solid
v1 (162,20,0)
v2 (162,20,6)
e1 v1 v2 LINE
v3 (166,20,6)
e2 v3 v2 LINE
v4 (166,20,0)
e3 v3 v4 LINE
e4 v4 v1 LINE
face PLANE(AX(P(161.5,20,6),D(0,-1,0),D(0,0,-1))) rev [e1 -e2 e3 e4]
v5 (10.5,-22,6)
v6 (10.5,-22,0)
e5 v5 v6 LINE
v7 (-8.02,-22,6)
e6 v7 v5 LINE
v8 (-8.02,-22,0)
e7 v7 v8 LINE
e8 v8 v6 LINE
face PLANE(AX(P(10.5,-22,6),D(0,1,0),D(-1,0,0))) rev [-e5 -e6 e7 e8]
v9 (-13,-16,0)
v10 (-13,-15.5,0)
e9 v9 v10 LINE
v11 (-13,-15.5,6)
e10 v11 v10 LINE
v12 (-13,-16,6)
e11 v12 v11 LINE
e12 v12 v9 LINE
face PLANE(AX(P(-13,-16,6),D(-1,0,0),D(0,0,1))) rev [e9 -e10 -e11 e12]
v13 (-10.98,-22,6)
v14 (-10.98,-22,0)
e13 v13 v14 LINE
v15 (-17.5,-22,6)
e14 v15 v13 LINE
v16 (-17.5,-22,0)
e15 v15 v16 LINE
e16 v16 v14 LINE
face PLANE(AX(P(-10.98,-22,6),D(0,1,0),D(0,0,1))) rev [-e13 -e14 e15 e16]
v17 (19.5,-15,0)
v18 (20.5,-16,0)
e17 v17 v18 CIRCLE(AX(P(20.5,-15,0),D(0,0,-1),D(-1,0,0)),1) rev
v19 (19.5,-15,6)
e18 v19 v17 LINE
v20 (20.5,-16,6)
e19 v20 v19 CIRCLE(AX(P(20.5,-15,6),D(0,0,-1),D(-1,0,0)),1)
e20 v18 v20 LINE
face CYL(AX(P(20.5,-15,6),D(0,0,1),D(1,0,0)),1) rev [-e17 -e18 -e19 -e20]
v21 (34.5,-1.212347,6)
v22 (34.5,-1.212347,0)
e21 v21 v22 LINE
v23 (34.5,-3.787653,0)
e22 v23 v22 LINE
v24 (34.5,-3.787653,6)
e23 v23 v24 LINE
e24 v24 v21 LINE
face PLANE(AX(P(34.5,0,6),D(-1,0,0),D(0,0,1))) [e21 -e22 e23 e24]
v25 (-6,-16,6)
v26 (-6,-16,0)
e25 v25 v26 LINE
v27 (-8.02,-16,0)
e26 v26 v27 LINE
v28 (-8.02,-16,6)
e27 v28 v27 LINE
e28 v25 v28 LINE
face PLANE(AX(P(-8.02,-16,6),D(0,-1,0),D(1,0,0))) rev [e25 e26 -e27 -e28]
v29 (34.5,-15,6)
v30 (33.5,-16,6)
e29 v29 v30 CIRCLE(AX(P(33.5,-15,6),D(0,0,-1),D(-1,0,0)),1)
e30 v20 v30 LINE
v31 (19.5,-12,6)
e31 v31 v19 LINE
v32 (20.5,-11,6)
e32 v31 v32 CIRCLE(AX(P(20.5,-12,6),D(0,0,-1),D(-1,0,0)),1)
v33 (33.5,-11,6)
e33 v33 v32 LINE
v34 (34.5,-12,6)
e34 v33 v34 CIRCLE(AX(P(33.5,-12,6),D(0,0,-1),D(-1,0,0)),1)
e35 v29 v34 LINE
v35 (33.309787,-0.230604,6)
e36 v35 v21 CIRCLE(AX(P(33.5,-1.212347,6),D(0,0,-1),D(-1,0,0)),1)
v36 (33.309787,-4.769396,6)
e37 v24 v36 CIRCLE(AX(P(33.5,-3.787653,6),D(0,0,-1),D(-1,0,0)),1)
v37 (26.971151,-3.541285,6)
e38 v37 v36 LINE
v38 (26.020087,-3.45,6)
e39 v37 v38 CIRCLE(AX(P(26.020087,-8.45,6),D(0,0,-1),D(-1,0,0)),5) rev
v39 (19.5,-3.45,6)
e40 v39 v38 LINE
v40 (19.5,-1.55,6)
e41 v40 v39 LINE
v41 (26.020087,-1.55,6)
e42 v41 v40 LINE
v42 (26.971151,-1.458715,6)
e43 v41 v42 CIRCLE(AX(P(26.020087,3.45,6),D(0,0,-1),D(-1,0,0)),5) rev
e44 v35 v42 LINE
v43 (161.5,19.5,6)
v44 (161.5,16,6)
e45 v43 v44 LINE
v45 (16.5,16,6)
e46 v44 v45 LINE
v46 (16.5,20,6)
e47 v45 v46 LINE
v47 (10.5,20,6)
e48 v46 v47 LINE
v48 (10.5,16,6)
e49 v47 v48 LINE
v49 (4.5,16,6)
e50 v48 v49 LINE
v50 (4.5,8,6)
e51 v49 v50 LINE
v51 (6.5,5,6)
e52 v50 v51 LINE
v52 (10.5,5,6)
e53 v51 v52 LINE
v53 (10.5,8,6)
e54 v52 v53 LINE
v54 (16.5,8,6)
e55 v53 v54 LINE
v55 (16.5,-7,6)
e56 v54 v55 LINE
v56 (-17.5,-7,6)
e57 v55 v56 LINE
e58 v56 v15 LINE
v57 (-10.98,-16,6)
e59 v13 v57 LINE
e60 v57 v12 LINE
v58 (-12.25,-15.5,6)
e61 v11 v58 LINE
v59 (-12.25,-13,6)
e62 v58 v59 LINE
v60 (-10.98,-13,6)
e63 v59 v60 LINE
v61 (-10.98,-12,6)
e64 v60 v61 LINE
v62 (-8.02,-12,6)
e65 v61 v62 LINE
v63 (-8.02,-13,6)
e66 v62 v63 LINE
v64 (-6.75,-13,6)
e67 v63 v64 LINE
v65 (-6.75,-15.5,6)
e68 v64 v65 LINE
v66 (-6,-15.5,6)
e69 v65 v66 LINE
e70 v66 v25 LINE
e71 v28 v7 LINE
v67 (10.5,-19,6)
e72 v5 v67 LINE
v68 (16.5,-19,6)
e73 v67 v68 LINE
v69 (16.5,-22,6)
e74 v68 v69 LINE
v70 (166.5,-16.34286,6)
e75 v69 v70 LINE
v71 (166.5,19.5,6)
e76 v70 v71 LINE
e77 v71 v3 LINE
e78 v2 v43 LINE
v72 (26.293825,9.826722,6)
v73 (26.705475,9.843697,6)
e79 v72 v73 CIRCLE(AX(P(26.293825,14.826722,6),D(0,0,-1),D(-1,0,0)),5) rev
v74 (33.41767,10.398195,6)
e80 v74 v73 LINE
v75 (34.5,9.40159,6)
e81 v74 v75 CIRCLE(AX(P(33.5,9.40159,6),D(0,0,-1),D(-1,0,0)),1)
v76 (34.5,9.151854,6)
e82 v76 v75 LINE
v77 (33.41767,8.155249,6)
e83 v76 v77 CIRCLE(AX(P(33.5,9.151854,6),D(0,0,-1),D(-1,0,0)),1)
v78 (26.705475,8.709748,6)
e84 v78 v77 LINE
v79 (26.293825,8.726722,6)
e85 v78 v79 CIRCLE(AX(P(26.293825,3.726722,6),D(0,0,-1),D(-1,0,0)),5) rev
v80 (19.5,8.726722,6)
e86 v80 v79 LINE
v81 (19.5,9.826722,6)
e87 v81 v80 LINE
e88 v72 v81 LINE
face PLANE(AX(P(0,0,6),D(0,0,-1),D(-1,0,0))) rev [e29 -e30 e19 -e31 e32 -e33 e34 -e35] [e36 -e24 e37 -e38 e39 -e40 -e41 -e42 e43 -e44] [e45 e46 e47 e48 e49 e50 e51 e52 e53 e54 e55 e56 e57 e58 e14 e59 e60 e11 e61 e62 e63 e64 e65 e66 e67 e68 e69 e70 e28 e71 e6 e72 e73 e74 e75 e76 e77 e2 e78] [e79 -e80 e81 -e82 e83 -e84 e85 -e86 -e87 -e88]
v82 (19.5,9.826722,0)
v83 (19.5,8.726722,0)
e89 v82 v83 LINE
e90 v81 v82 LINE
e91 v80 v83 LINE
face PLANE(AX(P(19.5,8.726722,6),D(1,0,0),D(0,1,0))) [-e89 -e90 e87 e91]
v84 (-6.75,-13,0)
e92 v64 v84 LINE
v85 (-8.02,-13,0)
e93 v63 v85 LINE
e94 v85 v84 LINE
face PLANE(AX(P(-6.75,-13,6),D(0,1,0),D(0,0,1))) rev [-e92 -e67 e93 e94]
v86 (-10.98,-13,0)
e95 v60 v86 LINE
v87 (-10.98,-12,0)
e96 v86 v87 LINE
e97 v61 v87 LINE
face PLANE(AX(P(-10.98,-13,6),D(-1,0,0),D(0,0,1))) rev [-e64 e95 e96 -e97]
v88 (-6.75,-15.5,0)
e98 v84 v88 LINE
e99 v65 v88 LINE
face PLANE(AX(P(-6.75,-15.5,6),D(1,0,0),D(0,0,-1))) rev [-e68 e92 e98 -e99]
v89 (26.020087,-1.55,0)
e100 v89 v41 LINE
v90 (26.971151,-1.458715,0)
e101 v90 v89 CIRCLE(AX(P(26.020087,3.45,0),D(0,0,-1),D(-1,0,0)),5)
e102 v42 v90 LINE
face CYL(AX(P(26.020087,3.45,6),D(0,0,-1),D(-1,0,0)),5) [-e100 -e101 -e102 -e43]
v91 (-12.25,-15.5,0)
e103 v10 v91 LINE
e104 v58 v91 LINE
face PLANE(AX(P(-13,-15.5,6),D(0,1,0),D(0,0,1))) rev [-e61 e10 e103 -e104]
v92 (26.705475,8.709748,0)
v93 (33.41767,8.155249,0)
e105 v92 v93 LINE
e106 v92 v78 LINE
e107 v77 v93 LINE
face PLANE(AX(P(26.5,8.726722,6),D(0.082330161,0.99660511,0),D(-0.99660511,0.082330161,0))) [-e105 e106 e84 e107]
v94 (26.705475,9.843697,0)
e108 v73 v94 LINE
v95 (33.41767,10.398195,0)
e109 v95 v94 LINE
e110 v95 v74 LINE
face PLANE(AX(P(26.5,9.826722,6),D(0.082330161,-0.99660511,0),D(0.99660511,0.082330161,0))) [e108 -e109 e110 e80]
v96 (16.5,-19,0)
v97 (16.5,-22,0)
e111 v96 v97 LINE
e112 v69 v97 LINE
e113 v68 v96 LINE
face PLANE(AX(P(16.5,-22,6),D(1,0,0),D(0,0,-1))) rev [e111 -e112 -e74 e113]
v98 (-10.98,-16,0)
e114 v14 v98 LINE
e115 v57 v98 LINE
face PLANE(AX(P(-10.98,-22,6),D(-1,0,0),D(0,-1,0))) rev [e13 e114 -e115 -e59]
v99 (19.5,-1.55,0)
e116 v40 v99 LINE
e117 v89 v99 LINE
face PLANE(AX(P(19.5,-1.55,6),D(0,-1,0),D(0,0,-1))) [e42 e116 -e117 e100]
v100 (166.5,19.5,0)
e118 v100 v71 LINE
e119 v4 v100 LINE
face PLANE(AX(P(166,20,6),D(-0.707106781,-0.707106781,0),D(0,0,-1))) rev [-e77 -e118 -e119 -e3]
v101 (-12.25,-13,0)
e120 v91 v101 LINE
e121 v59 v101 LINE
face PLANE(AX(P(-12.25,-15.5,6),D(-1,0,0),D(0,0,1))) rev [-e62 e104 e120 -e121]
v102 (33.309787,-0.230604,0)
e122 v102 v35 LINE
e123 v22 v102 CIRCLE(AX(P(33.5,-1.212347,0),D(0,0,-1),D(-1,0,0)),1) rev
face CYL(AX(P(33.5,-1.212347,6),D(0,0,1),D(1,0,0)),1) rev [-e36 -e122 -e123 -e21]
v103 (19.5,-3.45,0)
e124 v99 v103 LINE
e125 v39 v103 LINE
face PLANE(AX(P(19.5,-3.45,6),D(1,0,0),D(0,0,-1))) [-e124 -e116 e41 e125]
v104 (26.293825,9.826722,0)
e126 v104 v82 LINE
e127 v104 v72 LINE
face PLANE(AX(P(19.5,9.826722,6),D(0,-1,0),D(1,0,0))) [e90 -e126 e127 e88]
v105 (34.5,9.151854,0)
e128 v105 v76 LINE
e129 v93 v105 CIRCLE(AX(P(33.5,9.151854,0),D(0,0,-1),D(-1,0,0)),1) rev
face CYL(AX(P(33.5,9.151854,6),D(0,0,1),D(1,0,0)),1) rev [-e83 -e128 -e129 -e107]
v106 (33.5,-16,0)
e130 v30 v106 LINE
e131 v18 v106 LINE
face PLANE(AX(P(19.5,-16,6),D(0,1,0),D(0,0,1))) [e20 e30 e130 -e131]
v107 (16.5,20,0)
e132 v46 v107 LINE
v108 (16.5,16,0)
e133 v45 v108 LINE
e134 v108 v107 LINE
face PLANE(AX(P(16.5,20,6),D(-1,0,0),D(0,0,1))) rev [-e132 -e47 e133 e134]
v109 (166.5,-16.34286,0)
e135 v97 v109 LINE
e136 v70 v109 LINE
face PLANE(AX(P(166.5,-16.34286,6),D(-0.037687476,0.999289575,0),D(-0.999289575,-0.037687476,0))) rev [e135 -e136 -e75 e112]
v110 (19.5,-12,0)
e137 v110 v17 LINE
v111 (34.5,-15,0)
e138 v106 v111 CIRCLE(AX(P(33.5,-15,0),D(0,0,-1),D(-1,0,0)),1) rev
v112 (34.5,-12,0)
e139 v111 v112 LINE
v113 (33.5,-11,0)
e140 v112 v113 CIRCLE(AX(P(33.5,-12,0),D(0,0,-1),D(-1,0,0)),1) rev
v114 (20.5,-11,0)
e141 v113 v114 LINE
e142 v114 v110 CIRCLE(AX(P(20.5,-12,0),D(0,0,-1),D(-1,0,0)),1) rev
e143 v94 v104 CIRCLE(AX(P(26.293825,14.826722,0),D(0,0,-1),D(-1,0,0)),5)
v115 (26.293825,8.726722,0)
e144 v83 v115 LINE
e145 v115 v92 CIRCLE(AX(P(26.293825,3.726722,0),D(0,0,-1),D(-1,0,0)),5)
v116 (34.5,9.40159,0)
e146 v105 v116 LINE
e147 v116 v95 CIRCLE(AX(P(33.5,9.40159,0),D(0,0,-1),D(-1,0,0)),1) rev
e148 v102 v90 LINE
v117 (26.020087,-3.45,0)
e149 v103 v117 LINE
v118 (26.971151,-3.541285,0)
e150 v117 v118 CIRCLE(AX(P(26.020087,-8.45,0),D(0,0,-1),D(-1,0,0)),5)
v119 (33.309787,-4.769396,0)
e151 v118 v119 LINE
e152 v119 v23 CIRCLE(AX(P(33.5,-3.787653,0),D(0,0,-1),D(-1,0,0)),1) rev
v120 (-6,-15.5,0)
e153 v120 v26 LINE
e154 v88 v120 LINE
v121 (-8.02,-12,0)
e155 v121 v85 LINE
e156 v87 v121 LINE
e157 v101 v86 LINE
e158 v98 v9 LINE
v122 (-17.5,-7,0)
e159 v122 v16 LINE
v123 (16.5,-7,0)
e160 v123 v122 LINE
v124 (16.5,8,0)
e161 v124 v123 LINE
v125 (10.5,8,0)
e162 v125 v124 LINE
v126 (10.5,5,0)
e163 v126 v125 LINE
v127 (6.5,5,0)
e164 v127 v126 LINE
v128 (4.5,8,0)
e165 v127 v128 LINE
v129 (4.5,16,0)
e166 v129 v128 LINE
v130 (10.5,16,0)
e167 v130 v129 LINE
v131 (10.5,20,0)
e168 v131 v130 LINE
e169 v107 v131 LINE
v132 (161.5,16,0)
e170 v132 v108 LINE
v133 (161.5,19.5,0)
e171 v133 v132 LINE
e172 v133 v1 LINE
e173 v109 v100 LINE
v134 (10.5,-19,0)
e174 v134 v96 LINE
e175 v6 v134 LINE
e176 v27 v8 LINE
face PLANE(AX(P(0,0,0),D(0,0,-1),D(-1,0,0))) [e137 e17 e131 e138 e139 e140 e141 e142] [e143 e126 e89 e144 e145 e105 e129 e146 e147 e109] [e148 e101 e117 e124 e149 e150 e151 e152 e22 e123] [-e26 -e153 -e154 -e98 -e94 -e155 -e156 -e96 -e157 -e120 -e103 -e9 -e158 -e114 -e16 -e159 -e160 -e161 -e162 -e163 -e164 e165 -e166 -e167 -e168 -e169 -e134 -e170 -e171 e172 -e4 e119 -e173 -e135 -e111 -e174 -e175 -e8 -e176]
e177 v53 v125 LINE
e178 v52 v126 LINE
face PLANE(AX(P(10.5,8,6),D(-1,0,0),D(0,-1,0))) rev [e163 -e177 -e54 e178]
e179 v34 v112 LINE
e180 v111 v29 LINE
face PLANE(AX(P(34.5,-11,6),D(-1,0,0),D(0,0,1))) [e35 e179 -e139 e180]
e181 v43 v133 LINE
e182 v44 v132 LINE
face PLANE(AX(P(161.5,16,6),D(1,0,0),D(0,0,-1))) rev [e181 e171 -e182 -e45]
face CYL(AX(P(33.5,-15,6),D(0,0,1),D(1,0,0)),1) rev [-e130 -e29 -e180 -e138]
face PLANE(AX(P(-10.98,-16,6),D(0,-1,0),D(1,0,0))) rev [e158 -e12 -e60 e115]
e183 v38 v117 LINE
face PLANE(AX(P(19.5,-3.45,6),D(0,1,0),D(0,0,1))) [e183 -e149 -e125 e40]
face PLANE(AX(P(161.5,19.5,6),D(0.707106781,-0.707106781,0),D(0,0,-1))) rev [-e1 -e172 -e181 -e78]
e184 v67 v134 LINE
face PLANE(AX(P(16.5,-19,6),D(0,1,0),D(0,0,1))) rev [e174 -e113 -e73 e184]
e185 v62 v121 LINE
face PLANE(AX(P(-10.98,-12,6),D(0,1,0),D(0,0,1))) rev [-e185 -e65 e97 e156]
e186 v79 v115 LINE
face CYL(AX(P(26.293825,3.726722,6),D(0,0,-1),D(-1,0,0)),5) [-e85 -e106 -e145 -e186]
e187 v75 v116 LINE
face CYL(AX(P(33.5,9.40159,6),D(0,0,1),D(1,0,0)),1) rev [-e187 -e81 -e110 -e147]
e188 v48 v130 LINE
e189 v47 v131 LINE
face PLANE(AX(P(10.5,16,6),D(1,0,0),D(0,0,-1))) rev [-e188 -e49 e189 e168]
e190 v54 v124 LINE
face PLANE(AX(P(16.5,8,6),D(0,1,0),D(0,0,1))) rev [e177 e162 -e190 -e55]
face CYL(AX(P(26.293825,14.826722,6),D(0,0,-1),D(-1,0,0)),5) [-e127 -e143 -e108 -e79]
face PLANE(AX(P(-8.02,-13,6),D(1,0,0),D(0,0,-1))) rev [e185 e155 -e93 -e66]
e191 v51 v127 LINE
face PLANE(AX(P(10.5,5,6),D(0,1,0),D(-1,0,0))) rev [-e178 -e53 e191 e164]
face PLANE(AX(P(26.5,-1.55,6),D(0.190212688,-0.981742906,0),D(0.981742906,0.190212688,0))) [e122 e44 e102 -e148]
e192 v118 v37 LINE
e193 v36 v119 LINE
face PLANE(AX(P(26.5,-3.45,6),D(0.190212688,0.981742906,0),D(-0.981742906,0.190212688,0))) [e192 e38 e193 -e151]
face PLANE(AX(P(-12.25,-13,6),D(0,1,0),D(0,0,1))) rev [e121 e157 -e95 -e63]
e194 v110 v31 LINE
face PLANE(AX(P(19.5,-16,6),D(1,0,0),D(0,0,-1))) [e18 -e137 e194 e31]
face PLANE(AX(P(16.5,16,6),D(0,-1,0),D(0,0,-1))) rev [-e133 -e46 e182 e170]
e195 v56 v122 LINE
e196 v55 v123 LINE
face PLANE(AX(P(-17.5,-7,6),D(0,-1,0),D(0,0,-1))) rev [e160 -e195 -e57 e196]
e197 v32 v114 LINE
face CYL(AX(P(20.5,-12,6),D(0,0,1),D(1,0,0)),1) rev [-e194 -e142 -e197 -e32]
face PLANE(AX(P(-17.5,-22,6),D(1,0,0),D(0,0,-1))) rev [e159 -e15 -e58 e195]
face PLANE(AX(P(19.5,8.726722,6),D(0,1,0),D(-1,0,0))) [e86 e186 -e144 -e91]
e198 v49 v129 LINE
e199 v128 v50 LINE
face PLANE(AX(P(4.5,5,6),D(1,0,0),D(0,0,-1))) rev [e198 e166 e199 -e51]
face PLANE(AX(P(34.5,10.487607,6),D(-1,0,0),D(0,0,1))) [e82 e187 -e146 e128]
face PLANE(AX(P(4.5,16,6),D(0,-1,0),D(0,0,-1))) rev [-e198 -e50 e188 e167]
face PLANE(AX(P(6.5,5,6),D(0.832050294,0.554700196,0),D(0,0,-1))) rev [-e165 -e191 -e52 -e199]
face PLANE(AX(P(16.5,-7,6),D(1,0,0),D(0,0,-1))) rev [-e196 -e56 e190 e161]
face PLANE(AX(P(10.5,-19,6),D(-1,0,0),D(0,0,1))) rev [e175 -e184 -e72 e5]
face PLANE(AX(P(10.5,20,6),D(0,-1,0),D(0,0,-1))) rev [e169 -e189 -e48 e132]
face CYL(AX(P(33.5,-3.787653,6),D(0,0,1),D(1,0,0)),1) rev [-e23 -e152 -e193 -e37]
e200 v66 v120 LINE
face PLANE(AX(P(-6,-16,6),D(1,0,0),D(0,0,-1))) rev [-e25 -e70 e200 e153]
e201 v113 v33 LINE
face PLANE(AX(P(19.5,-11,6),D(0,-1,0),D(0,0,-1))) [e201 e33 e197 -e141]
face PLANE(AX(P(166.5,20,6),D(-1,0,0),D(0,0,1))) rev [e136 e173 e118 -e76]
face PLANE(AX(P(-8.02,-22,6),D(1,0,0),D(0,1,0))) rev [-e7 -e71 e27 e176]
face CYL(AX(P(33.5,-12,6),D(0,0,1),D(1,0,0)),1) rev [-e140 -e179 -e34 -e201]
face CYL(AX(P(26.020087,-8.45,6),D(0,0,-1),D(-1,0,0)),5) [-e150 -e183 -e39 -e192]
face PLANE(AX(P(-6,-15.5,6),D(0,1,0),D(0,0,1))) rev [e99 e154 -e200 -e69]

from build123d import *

# Parameters (mm, degrees)
SKETCH1_W           = 15
SKETCH1_H           = 5
BOSS_EXTRUDE1_DEPTH = 6
CHAMFER1_SIZE       = 3
CHAMFER1_SIZE2      = 2
FILLET1_R           = 1
FILLET2_R           = 5
CHAMFER2_SIZE       = 0.5


with BuildPart() as part:
    # Sketch1 → Boss-Extrude1 (new body)
    with BuildSketch(Plane.XY):
        Polygon((-17.5, -7), (16.5, -7), (16.5, 8), (10.5, 8), (10.5, 5), (4.5, 5), (4.5, 16), (10.5, 16), (10.5, 20), (16.5, 20), (16.5, 16), (161.5, 16), (161.5, 20), (166.5, 20), (166.5, -16.342859565), (16.5, -22), (16.5, -19), (10.5, -19), (10.5, -22), (-8.02, -22), (-8.02, -16), (-6, -16), (-6, -15.5), (-6.75, -15.5), (-6.75, -13), (-8.02, -13), (-8.02, -12), (-10.98, -12), (-10.98, -13), (-12.25, -13), (-12.25, -15.5), (-13, -15.5), (-13, -16), (-10.98, -16), (-10.98, -22), (-17.5, -22), align=None)
        Polygon((19.5, -3.45), (19.5, -1.55), (26.5, -1.55), (34.5, 0), (34.5, -5), (26.5, -3.45), align=None, mode=Mode.SUBTRACT)
        with Locations((27, -13.5)):
            Rectangle(SKETCH1_W, SKETCH1_H, mode=Mode.SUBTRACT)
        Polygon((19.5, 8.726722117), (19.5, 9.826722117), (26.5, 9.826722117), (34.5, 10.487607038), (34.5, 8.065837195), (26.5, 8.726722117), align=None, mode=Mode.SUBTRACT)
    extrude(amount=BOSS_EXTRUDE1_DEPTH)

    # Chamfer1
    chamfer1_edges = [part.edges().sort_by_distance(p)[0] for p in [
        (4.5, 5, 3),
    ]]
    chamfer1_side = [part.faces().sort_by_distance(p)[0] for p in [
        (4.5, 10.5, 3),
    ]]
    chamfer(chamfer1_edges, length=CHAMFER1_SIZE, length2=CHAMFER1_SIZE2, reference=chamfer1_side[0])

    # Fillet1
    fillet1_edges = [part.edges().sort_by_distance(p)[0] for p in [
        (19.5, -16, 3),
        (34.5, -16, 3),
        (34.5, -11, 3),
        (19.5, -11, 3),
        (34.5, 8.065837195, 3),
        (34.5, 10.487607038, 3),
        (34.5, -5, 3),
        (34.5, 0, 3),
    ]]
    fillet(fillet1_edges, radius=FILLET1_R)

    # Fillet2
    # the kernel refuses this fillet: 5 mm, written as the material it takes off along each edge
    with BuildSketch(Plane(origin=(26.5, 8.726722117, -0.515438436), x_dir=(0.9966051096378002, -0.08233016120370525, 0), z_dir=(0, 0, 1)), Plane(origin=(26.5, 9.826722117, -0.515438436), x_dir=(-1, 0, 0), z_dir=(0, 0, 1))) as fillet2_piece_1:
        with BuildLine():
            CenterArc((FILLET2_R * 0.041235074881, -FILLET2_R), FILLET2_R, 90, 4.722516116)
            Line((-FILLET2_R * 0.0410950863227, -FILLET2_R * 0.0033948903622), (0, 0))
            Line((0, 0), (FILLET2_R * 0.041235074881, 0))
        make_face()
    extrude(amount=7.030876872, mode=Mode.SUBTRACT)
    with BuildSketch(Plane(origin=(26.5, -3.45, -1.199781563), x_dir=(0.9817429059156794, -0.19021268802116595, 0), z_dir=(0, 0, 1)), Plane(origin=(26.5, -1.55, -1.199781563), x_dir=(-1, 0, 0), z_dir=(0, 0, 1))) as fillet2_piece_2:
        with BuildLine():
            CenterArc((FILLET2_R * 0.0959825250053, -FILLET2_R), FILLET2_R, 90, 10.965196685)
            Line((-FILLET2_R * 0.0942301630158, -FILLET2_R * 0.0182570940843), (0, 0))
            Line((0, 0), (FILLET2_R * 0.0959825250053, 0))
        make_face()
    extrude(amount=8.399563125, mode=Mode.SUBTRACT)

    # Chamfer2
    chamfer2_edges = [part.edges().sort_by_distance(p)[0] for p in [
        (161.5, 20, 3),
        (166.5, 20, 3),
    ]]
    chamfer(chamfer2_edges, length=CHAMFER2_SIZE)


solid = part.part
